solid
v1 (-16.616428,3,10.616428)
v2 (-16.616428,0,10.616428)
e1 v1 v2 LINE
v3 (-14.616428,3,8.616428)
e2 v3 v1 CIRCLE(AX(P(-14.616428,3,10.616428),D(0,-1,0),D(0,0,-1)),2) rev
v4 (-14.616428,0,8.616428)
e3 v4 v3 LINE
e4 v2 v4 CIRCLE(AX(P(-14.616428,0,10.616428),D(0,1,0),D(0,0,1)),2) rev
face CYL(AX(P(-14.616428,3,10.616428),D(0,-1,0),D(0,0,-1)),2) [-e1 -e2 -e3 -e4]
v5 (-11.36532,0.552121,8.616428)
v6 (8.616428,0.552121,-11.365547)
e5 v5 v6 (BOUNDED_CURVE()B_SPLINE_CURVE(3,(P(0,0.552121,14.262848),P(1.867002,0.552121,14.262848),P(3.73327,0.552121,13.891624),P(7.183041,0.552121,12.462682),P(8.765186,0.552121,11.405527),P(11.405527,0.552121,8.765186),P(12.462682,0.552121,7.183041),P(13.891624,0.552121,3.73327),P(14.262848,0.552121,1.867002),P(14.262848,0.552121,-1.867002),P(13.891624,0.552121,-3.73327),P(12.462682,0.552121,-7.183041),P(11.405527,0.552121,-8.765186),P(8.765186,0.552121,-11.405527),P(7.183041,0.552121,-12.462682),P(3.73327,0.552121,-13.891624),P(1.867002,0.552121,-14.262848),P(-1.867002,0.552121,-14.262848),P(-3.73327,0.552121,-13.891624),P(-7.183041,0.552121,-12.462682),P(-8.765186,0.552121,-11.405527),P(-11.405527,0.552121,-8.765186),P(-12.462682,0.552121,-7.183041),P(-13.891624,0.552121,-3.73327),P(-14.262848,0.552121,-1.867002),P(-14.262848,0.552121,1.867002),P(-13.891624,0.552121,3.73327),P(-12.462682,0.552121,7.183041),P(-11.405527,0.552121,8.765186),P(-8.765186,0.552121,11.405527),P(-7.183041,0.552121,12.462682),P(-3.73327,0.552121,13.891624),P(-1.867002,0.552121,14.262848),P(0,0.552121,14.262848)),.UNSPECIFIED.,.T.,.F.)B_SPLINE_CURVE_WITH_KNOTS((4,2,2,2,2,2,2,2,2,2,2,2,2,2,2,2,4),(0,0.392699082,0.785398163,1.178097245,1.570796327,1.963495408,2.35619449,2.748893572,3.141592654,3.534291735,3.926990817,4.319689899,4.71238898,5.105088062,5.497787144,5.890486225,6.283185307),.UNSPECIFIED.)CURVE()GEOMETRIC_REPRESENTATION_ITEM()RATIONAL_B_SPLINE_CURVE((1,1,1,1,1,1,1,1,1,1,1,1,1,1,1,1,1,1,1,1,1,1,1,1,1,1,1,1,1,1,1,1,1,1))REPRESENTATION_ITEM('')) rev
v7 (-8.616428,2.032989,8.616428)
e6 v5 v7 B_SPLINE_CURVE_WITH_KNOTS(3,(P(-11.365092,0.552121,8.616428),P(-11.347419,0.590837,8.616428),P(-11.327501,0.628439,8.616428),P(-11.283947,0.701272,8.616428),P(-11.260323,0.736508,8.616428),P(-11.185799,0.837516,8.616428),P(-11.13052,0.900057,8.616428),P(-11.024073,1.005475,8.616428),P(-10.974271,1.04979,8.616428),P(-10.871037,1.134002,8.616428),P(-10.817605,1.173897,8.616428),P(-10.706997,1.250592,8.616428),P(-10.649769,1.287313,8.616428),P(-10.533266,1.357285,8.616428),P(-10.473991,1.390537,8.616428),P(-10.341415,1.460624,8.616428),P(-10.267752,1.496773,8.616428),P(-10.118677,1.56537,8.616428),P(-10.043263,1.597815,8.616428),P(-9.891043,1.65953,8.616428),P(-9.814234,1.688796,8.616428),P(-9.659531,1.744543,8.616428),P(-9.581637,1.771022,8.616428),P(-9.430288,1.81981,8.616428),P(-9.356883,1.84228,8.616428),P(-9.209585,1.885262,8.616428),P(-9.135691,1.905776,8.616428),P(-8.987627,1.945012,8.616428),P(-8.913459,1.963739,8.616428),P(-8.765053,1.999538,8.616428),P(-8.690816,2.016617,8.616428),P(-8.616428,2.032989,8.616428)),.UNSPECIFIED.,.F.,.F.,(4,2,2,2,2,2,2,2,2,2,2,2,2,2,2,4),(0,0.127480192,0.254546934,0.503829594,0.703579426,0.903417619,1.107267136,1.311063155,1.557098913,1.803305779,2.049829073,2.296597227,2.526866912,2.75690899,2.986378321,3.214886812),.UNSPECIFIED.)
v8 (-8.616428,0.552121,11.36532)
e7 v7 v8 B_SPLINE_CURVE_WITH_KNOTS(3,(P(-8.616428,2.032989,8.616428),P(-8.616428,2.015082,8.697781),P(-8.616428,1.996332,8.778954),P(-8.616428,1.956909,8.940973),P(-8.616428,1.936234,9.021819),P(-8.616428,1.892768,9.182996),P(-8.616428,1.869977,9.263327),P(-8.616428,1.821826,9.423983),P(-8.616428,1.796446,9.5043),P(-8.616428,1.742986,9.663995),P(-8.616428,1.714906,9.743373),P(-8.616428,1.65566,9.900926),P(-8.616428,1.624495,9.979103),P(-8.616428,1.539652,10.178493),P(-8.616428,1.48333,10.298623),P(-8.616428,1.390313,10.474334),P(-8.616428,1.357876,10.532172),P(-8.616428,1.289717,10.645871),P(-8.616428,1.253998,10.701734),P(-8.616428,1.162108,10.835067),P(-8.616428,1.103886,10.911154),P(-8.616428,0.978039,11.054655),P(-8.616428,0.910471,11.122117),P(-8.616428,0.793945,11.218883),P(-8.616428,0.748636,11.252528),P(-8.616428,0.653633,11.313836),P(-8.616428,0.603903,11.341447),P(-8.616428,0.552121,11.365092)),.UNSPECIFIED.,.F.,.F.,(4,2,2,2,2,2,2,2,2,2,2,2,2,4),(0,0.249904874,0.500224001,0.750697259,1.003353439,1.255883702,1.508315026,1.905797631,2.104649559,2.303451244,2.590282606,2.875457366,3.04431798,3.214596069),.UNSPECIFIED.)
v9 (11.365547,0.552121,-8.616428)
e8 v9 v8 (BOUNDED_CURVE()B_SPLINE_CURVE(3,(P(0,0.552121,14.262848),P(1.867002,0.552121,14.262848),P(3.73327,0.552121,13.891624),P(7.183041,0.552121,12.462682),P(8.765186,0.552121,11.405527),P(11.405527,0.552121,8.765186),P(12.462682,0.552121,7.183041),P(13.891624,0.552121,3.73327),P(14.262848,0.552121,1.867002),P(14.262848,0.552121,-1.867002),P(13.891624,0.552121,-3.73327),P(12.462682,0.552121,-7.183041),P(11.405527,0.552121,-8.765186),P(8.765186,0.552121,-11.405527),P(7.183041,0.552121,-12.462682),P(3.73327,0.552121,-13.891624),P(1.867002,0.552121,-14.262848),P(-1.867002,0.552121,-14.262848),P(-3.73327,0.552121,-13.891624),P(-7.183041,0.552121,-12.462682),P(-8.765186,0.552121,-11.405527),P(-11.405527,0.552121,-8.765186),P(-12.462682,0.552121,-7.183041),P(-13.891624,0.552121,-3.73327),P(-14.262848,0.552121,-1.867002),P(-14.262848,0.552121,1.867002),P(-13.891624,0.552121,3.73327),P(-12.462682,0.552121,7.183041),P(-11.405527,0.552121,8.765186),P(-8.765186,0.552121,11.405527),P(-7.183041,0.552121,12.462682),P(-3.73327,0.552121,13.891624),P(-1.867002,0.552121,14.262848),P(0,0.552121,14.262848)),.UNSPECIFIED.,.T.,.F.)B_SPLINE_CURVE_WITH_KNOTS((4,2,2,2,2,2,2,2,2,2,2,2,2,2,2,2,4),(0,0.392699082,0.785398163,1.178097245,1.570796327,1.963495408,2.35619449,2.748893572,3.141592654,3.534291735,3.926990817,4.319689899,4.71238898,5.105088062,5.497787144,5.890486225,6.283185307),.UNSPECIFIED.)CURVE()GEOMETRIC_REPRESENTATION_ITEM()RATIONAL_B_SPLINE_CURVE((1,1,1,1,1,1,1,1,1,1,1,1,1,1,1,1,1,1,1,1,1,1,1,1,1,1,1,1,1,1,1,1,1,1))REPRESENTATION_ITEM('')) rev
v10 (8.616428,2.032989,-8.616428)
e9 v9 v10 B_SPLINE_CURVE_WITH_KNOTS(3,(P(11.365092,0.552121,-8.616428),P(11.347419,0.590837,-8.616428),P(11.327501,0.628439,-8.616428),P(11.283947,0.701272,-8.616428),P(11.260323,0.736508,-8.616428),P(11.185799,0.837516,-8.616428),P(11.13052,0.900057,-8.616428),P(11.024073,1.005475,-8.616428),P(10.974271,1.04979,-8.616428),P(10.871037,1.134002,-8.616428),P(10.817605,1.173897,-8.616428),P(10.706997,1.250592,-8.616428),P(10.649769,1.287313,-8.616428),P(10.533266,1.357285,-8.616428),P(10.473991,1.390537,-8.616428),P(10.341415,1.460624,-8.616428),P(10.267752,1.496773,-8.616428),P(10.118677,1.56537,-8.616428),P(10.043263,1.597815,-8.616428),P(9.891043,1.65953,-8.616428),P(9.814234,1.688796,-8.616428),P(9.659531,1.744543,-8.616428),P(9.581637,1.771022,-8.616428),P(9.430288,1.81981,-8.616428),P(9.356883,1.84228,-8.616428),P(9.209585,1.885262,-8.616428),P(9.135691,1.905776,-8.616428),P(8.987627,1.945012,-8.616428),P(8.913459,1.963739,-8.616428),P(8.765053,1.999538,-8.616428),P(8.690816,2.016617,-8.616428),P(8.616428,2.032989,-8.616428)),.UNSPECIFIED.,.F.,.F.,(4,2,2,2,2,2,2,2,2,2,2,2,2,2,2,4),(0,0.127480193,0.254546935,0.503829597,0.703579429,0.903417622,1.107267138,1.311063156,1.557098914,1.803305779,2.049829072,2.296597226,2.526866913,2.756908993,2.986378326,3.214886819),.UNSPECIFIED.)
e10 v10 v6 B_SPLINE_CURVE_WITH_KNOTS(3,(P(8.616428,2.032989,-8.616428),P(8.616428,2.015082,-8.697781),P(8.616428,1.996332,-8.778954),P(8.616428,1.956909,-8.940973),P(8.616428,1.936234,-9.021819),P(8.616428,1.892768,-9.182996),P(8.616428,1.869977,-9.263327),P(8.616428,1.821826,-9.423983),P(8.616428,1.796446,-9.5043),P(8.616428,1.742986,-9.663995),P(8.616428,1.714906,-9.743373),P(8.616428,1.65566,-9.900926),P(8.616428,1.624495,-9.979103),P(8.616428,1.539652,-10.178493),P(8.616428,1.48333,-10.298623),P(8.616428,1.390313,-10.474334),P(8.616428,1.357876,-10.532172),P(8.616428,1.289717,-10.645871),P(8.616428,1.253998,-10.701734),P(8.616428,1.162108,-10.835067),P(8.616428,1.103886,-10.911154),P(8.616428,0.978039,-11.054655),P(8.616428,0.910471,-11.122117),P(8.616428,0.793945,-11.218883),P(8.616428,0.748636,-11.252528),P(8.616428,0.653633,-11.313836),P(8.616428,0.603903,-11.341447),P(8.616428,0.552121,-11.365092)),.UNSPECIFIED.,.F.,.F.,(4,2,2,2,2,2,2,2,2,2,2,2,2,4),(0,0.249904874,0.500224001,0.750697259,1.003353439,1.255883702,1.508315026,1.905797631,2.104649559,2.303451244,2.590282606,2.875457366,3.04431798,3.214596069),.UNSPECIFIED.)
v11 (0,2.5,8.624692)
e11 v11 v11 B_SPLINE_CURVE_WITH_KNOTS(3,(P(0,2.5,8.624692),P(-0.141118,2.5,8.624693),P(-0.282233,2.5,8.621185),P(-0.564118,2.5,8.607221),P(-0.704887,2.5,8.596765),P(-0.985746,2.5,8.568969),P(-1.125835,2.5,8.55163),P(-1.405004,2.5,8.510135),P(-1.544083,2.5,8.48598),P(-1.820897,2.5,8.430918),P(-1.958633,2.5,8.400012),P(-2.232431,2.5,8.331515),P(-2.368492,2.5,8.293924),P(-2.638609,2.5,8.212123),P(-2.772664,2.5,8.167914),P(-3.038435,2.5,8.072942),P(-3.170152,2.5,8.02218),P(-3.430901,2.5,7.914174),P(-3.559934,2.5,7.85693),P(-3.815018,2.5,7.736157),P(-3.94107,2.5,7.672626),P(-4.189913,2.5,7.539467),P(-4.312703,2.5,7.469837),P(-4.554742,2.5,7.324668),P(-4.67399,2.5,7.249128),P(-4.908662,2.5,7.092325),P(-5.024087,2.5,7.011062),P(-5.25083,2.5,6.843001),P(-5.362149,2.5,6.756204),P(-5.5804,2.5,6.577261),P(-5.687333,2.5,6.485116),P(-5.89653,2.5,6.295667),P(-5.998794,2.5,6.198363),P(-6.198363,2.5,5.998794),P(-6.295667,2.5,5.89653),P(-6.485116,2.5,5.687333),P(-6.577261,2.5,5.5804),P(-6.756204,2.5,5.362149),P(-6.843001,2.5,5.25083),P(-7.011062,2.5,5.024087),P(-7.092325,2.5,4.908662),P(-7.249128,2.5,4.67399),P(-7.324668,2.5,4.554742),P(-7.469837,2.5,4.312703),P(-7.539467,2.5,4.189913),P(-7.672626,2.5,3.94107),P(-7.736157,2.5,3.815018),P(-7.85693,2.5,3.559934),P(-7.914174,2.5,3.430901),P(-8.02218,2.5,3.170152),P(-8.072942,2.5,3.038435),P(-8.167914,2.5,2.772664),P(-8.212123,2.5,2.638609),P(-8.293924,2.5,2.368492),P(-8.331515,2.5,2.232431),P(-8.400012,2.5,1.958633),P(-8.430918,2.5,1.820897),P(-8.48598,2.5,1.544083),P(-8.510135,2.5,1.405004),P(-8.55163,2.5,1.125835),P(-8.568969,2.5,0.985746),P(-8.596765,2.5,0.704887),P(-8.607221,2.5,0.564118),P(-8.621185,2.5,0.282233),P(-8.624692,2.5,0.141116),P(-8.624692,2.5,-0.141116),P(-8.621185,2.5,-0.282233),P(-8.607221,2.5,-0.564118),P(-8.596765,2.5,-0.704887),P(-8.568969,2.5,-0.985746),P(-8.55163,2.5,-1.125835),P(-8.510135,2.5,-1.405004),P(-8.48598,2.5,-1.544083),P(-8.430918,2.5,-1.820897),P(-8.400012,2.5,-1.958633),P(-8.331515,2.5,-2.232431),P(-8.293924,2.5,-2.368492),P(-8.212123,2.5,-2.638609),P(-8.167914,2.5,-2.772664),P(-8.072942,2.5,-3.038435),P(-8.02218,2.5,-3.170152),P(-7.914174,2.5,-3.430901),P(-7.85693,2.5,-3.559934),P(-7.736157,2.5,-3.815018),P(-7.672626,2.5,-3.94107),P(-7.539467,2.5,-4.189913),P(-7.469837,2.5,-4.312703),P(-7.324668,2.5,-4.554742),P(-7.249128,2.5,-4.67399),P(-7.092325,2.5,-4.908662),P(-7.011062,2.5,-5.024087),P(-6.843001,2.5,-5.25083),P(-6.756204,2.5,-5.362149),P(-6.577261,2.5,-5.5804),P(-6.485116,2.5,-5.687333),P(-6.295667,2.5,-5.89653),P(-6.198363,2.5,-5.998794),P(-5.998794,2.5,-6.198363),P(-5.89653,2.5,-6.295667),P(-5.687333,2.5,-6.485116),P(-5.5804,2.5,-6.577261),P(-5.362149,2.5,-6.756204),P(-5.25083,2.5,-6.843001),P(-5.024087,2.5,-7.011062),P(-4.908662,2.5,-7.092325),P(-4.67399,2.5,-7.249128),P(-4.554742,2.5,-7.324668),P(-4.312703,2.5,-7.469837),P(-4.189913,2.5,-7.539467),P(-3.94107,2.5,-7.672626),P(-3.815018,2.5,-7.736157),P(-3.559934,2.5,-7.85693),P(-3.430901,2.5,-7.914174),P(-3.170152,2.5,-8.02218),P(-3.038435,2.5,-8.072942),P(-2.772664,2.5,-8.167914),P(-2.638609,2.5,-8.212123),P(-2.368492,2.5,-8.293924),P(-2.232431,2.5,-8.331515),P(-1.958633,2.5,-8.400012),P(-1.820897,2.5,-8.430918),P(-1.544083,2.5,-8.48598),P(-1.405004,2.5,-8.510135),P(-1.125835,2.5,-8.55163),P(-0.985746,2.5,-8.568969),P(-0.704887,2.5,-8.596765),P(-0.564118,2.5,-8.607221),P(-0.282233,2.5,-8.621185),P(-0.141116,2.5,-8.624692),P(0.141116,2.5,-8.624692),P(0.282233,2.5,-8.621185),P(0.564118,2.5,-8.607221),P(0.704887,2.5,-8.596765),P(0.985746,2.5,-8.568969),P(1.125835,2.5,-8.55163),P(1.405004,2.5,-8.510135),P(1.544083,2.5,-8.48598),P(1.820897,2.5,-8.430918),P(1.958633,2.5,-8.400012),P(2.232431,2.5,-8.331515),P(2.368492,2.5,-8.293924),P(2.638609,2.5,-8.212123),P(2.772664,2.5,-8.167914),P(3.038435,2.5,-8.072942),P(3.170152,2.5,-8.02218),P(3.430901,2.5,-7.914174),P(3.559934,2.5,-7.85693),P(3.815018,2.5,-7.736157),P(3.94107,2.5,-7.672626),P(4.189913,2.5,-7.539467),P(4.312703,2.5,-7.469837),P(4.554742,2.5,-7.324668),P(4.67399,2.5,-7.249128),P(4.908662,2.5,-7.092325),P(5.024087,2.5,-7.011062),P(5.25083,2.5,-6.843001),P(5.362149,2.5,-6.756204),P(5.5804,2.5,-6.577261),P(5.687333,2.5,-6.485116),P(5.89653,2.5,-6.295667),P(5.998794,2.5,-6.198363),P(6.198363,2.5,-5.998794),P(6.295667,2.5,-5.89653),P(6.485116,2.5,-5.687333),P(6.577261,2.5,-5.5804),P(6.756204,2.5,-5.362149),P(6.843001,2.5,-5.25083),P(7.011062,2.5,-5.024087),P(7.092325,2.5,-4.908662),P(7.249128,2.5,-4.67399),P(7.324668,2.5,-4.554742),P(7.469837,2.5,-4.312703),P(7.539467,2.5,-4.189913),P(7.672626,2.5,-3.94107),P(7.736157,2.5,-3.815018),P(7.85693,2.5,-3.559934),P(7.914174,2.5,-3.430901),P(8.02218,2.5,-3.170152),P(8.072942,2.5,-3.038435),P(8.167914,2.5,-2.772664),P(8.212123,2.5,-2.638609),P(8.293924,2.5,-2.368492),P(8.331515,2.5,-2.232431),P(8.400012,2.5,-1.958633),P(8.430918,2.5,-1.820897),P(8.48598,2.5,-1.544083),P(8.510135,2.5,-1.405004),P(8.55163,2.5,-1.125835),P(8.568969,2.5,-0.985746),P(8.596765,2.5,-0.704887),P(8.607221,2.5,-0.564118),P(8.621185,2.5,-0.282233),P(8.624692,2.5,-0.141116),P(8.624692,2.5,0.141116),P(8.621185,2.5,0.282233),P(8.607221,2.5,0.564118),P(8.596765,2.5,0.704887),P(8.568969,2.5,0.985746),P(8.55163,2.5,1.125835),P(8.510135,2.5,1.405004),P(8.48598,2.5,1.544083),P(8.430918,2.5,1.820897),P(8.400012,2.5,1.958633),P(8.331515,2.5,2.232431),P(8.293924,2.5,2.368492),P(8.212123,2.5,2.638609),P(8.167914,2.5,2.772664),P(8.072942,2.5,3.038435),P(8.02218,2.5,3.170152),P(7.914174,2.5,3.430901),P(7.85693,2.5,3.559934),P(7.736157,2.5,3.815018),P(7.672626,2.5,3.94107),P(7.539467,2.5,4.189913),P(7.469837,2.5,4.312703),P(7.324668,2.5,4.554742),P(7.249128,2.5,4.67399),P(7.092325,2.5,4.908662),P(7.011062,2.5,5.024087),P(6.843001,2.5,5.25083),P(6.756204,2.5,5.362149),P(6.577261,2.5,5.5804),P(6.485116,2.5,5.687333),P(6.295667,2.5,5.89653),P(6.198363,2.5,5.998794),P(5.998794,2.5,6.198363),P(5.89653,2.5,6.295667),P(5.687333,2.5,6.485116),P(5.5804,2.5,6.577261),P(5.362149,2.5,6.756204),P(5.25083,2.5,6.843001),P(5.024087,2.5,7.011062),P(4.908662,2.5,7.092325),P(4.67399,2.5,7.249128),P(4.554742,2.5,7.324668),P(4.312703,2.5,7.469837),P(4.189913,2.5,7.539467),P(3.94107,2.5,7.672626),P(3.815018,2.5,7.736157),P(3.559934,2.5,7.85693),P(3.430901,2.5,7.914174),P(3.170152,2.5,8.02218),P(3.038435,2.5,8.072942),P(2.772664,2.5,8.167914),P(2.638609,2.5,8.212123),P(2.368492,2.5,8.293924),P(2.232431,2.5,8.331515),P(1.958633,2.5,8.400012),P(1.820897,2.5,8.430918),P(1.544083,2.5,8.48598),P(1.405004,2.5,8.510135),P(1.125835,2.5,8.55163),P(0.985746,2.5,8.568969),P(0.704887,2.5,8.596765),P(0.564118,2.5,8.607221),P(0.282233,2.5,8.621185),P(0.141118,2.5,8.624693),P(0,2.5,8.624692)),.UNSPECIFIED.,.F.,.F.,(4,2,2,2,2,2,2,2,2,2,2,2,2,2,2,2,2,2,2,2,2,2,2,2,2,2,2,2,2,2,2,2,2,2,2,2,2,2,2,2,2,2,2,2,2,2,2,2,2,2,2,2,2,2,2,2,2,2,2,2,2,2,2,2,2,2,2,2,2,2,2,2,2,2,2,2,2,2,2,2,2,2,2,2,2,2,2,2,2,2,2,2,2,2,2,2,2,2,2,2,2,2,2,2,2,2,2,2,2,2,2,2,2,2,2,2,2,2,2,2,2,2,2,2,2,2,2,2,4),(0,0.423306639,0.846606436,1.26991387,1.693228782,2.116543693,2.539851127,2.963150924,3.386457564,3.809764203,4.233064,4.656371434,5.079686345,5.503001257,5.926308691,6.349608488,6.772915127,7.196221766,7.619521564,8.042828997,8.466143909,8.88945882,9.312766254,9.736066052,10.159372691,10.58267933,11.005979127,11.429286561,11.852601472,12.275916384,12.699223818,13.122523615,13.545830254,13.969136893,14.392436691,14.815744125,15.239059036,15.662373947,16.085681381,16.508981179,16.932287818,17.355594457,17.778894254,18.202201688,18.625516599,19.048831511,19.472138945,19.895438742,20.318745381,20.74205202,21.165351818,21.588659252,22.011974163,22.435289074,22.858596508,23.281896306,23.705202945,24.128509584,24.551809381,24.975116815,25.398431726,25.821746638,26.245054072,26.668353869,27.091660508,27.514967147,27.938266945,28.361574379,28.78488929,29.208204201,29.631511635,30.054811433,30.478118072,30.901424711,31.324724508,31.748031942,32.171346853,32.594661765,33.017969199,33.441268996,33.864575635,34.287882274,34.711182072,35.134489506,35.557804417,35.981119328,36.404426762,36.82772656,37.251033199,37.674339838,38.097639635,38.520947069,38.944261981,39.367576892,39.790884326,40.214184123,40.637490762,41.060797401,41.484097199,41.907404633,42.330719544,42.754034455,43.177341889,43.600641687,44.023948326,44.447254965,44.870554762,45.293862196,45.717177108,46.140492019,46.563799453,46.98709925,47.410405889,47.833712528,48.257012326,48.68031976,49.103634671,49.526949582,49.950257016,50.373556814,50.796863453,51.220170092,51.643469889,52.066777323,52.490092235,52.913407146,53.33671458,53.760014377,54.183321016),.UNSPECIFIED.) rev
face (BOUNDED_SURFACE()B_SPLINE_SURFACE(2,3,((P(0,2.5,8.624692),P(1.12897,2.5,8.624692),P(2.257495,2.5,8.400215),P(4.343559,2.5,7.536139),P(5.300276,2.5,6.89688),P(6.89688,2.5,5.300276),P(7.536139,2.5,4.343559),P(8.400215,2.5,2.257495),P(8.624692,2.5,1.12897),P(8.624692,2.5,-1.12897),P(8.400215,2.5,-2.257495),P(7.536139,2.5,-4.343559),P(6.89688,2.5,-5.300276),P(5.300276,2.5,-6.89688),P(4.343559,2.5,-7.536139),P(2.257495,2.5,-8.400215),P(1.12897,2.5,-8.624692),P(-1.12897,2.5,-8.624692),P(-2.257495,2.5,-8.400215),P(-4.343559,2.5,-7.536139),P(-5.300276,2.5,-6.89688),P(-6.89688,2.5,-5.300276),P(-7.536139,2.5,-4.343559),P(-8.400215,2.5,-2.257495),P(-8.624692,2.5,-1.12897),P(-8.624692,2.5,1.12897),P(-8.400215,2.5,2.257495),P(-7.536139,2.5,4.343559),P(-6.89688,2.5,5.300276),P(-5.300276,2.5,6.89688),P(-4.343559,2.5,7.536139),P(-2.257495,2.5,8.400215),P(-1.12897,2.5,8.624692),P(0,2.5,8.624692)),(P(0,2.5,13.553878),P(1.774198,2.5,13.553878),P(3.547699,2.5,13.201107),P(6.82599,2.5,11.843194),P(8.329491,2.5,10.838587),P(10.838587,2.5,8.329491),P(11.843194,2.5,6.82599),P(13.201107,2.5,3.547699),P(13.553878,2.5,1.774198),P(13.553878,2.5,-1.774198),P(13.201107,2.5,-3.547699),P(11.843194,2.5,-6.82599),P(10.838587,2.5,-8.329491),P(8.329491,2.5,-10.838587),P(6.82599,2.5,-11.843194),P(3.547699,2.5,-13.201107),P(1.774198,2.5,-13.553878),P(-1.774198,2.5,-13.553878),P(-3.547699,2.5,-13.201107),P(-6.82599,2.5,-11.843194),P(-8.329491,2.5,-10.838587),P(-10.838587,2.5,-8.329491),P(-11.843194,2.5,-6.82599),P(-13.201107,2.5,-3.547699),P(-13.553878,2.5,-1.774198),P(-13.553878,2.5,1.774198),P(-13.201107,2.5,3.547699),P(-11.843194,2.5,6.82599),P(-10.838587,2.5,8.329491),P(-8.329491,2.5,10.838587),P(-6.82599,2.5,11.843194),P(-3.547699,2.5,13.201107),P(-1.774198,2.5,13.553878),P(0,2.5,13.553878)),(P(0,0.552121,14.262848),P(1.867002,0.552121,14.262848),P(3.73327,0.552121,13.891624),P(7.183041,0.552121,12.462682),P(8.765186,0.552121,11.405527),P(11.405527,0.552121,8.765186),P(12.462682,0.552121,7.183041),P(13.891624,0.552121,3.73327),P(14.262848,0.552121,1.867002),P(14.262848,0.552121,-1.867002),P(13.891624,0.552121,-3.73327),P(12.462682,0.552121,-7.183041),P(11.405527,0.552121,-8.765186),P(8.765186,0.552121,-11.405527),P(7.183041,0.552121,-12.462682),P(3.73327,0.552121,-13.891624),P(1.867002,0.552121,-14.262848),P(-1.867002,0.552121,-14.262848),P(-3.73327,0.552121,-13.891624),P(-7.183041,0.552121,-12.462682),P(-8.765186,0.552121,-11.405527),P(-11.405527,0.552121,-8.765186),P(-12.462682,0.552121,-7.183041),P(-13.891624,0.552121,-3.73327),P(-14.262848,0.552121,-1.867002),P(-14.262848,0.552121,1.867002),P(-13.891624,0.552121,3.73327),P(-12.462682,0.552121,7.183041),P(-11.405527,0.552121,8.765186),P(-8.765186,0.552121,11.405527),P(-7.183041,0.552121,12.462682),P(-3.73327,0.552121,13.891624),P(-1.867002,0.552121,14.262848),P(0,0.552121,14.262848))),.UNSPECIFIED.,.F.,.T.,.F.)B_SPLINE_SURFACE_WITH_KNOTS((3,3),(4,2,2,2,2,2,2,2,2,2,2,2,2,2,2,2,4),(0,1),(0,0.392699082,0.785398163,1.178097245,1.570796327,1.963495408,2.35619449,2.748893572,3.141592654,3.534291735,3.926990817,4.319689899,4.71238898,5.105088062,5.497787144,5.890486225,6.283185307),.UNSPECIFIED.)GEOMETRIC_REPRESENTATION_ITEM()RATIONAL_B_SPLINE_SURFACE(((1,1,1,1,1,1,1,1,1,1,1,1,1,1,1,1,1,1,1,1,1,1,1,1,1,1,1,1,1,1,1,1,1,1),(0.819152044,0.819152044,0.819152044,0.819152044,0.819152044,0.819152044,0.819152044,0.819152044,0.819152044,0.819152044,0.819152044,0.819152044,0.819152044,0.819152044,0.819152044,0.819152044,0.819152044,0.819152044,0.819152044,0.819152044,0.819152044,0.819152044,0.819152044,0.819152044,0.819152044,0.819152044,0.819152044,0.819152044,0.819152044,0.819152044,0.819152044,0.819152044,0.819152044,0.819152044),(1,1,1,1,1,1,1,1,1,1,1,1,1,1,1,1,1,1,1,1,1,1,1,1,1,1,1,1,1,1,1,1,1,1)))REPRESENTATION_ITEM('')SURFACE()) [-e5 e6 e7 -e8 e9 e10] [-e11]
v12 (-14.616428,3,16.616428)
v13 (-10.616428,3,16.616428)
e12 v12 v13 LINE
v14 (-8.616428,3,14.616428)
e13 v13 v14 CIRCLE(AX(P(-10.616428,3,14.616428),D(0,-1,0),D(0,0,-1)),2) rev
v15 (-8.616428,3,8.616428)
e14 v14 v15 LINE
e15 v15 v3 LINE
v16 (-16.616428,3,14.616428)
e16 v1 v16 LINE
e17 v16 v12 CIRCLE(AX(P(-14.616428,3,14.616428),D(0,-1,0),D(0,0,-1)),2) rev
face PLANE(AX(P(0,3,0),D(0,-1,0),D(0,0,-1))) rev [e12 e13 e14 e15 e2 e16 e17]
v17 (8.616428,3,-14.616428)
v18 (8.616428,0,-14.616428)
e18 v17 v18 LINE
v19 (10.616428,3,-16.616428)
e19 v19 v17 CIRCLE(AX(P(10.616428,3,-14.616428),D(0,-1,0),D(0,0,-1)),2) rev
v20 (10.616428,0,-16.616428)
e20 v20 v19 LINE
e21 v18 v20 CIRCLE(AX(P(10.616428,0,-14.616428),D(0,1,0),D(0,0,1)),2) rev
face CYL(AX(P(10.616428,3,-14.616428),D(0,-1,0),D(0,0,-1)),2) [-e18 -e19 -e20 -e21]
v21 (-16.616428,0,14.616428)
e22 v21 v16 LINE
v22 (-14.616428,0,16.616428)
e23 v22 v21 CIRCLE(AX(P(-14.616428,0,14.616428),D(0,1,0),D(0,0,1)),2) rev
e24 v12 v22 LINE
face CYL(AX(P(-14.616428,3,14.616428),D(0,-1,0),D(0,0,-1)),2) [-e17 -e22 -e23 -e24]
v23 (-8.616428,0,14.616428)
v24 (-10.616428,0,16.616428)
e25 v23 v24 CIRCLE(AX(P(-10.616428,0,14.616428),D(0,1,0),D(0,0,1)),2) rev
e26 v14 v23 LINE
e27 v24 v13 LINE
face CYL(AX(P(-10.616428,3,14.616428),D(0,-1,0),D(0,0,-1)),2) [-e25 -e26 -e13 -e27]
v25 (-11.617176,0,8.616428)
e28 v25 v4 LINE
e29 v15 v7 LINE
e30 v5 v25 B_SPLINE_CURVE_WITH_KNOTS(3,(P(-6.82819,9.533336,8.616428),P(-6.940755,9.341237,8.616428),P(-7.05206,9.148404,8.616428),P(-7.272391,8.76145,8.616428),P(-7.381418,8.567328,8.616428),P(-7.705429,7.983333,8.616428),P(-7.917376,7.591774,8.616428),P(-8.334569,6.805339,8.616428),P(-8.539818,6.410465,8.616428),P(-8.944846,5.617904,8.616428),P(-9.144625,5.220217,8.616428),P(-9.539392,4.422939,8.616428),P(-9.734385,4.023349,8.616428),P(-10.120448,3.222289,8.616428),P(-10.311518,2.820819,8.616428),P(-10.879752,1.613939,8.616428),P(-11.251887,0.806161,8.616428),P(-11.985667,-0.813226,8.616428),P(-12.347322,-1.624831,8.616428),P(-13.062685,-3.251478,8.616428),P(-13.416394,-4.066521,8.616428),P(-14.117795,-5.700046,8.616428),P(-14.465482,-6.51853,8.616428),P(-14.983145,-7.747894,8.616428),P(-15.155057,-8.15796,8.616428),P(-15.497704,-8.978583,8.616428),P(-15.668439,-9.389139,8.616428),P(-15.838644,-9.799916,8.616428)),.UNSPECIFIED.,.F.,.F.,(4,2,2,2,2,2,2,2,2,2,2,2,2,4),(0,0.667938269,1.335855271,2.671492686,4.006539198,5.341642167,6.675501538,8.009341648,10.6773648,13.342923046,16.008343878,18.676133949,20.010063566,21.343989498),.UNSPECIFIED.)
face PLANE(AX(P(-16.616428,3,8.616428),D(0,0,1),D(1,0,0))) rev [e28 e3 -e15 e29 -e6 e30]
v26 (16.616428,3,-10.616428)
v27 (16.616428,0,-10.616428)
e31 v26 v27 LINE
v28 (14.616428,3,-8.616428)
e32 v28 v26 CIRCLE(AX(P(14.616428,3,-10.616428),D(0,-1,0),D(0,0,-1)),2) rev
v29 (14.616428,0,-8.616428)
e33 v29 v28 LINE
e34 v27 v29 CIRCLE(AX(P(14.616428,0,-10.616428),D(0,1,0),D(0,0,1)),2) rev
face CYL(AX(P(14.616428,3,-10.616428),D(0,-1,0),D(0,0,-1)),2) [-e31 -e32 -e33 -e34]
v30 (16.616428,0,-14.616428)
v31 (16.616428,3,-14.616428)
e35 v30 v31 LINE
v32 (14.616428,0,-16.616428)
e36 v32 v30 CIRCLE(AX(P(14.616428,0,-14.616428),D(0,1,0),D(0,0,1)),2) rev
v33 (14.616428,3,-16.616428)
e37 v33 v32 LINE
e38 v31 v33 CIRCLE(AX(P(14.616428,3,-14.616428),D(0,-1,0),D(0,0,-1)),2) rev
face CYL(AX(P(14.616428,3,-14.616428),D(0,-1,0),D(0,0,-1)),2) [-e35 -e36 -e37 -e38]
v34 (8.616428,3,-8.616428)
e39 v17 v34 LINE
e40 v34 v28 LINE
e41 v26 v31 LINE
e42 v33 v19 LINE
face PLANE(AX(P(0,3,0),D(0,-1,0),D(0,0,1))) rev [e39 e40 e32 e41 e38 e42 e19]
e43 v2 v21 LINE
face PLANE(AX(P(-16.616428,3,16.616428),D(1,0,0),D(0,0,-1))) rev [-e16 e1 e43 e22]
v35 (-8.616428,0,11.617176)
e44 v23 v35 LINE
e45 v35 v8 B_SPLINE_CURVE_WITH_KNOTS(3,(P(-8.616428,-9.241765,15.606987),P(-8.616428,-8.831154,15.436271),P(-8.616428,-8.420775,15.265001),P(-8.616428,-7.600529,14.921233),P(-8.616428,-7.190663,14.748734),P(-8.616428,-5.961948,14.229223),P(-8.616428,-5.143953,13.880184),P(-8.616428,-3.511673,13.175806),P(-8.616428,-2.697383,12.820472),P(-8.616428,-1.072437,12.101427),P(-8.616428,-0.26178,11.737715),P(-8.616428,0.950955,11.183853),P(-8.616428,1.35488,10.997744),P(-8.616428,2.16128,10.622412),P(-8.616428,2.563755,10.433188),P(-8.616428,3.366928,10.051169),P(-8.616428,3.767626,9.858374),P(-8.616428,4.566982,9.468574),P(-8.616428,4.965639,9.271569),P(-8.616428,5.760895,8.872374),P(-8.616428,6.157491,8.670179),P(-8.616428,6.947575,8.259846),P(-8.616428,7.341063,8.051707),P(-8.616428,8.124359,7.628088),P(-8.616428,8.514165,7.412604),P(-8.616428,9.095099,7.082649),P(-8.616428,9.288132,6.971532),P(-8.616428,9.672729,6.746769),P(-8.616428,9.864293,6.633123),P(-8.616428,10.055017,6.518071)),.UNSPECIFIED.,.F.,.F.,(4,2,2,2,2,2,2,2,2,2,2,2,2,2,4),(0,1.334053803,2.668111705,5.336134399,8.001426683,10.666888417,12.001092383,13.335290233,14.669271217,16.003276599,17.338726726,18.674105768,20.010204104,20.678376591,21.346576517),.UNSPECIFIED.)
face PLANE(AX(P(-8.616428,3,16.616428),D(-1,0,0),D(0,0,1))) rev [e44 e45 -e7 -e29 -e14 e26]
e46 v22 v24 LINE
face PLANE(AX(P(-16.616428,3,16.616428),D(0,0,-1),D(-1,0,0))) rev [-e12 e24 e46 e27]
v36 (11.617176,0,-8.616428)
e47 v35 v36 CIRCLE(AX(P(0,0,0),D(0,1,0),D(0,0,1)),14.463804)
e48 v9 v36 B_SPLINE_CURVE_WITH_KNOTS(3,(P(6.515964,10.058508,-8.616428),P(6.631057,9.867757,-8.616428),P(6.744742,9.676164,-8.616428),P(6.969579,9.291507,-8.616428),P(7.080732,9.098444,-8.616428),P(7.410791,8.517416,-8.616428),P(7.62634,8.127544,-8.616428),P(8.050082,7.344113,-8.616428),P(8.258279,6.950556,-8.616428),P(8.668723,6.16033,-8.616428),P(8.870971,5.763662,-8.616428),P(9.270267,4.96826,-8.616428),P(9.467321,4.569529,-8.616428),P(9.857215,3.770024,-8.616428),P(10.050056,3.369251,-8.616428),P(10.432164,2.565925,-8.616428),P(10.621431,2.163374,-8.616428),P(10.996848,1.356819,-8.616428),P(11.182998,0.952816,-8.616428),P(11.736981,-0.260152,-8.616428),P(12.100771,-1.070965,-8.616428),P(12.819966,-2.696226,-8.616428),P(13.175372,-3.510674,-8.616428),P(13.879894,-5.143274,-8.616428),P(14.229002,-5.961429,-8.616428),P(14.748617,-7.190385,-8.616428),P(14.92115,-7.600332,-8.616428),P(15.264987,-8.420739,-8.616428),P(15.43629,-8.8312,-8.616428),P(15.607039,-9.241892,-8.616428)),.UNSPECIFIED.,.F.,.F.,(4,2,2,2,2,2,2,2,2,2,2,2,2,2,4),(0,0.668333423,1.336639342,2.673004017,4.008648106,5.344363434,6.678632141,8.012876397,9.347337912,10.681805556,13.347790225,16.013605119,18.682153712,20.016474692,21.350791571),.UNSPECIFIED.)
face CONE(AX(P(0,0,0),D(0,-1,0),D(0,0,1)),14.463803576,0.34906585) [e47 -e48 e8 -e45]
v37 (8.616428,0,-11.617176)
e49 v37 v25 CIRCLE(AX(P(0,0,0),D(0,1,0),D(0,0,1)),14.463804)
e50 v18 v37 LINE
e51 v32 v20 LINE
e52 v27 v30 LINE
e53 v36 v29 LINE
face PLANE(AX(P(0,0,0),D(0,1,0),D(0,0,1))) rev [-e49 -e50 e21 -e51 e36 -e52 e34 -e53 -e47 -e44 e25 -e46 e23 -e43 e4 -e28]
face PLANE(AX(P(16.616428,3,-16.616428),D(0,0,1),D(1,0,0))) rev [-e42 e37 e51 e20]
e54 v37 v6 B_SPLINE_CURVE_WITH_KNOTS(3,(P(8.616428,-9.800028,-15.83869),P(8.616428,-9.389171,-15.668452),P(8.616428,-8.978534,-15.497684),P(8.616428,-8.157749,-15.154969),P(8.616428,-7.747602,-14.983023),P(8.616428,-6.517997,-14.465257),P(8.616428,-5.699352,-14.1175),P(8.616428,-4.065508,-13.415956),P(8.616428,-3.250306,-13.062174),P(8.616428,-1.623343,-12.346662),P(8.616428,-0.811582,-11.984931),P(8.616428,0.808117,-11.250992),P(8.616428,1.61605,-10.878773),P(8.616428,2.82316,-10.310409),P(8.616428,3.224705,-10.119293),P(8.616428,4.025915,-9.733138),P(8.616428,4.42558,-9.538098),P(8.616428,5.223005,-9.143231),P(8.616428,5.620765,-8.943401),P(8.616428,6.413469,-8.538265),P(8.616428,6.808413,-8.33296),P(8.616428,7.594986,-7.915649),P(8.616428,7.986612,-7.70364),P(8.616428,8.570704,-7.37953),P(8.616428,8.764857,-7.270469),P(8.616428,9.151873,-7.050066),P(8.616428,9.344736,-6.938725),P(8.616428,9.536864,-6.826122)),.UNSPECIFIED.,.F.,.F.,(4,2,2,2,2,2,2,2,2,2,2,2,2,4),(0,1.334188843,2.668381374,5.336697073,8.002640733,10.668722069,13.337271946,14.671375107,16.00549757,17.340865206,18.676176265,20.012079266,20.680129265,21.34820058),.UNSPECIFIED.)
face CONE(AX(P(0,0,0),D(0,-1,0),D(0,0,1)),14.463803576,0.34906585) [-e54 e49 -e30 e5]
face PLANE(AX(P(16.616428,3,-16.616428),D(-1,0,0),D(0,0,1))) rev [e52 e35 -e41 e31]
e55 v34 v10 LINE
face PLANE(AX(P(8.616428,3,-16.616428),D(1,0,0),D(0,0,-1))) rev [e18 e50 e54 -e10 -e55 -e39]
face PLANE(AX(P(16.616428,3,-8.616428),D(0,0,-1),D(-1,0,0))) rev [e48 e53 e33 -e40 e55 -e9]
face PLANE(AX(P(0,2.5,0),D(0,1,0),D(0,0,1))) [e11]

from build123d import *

# Parameters (mm, degrees)
SKETCH2_R                = 14.463803576
BOSS_EXTRUDE1_DEPTH      = 2.5
BOSS_EXTRUDE1_TAPER      = 20
SKETCH4_W                = 8
SKETCH4_H                = 8
BOSS_EXTRUDE2_DEPTH      = 3
FILLET2_R                = 2
CIRPATTERN1_COUNT        = 4
FILLET2_OF_CIRPATTERN1_R = 2


with BuildPart() as part:
    # Sketch2 → Boss-Extrude1 (new body)
    with BuildSketch(Plane(origin=(0, 0, 0), x_dir=(1, 0, 0), z_dir=(0, 1, 0))):
        Circle(SKETCH2_R)
    extrude(amount=BOSS_EXTRUDE1_DEPTH, taper=BOSS_EXTRUDE1_TAPER)

    # Fillet1
    # an asymmetric fillet: 6, 4 mm, written as the material it takes off along each edge
    with BuildSketch(Plane(origin=(0, 2.5, 0), x_dir=(1, 0, 0), z_dir=(0, 0, -1))) as fillet1_piece_1:
        with BuildLine():
            Bezier((14.262848017, 1.94787914), (13.55387799, 0), (8.624692292, 0), weights=[1, 0.819152044, 1])
            Line((8.624692292, 0), (13.55387799, 0))
            Line((13.55387799, 0), (14.262848017, 1.94787914))
        make_face()
    revolve(axis=Axis((0, 2.5, 0), (0, -1, 0)), mode=Mode.SUBTRACT)

    # Sketch4 → Boss-Extrude2 (add)
    with BuildSketch(Plane(origin=(0, 0, 0), x_dir=(1, 0, 0), z_dir=(0, 1, 0))):
        with Locations((-12.616427752, -12.616427752)):
            Rectangle(SKETCH4_W, SKETCH4_H)
    boss_extrude2 = extrude(amount=BOSS_EXTRUDE2_DEPTH)

    # Fillet2
    fillet2_edges = [part.edges().sort_by_distance(p)[0] for p in [
        (-8.616427752, 1.5, 16.616427752),
        (-16.616427752, 1.5, 8.616427752),
        (-16.616427752, 1.5, 16.616427752),
    ]]
    fillet(fillet2_edges, radius=FILLET2_R)

    # CirPattern1: Boss-Extrude2 ×4 about axis, 2 skipped
    cirpattern1_axis = Axis((0, 0, 0), (0, 1, 0))
    add([boss_extrude2.rotate(cirpattern1_axis, i * 360 / CIRPATTERN1_COUNT) for i in range(1, CIRPATTERN1_COUNT) if i not in (1, 3)])

    # Fillet2 of CirPattern1
    fillet2_of_cirpattern1_edges = [part.edges().sort_by_distance(p)[0] for p in [
        (8.616427752, 1.5, -16.616427752),
        (16.616427752, 1.5, -8.616427752),
        (16.616427752, 1.5, -16.616427752),
    ]]
    fillet(fillet2_of_cirpattern1_edges, radius=FILLET2_OF_CIRPATTERN1_R)


solid = part.part
